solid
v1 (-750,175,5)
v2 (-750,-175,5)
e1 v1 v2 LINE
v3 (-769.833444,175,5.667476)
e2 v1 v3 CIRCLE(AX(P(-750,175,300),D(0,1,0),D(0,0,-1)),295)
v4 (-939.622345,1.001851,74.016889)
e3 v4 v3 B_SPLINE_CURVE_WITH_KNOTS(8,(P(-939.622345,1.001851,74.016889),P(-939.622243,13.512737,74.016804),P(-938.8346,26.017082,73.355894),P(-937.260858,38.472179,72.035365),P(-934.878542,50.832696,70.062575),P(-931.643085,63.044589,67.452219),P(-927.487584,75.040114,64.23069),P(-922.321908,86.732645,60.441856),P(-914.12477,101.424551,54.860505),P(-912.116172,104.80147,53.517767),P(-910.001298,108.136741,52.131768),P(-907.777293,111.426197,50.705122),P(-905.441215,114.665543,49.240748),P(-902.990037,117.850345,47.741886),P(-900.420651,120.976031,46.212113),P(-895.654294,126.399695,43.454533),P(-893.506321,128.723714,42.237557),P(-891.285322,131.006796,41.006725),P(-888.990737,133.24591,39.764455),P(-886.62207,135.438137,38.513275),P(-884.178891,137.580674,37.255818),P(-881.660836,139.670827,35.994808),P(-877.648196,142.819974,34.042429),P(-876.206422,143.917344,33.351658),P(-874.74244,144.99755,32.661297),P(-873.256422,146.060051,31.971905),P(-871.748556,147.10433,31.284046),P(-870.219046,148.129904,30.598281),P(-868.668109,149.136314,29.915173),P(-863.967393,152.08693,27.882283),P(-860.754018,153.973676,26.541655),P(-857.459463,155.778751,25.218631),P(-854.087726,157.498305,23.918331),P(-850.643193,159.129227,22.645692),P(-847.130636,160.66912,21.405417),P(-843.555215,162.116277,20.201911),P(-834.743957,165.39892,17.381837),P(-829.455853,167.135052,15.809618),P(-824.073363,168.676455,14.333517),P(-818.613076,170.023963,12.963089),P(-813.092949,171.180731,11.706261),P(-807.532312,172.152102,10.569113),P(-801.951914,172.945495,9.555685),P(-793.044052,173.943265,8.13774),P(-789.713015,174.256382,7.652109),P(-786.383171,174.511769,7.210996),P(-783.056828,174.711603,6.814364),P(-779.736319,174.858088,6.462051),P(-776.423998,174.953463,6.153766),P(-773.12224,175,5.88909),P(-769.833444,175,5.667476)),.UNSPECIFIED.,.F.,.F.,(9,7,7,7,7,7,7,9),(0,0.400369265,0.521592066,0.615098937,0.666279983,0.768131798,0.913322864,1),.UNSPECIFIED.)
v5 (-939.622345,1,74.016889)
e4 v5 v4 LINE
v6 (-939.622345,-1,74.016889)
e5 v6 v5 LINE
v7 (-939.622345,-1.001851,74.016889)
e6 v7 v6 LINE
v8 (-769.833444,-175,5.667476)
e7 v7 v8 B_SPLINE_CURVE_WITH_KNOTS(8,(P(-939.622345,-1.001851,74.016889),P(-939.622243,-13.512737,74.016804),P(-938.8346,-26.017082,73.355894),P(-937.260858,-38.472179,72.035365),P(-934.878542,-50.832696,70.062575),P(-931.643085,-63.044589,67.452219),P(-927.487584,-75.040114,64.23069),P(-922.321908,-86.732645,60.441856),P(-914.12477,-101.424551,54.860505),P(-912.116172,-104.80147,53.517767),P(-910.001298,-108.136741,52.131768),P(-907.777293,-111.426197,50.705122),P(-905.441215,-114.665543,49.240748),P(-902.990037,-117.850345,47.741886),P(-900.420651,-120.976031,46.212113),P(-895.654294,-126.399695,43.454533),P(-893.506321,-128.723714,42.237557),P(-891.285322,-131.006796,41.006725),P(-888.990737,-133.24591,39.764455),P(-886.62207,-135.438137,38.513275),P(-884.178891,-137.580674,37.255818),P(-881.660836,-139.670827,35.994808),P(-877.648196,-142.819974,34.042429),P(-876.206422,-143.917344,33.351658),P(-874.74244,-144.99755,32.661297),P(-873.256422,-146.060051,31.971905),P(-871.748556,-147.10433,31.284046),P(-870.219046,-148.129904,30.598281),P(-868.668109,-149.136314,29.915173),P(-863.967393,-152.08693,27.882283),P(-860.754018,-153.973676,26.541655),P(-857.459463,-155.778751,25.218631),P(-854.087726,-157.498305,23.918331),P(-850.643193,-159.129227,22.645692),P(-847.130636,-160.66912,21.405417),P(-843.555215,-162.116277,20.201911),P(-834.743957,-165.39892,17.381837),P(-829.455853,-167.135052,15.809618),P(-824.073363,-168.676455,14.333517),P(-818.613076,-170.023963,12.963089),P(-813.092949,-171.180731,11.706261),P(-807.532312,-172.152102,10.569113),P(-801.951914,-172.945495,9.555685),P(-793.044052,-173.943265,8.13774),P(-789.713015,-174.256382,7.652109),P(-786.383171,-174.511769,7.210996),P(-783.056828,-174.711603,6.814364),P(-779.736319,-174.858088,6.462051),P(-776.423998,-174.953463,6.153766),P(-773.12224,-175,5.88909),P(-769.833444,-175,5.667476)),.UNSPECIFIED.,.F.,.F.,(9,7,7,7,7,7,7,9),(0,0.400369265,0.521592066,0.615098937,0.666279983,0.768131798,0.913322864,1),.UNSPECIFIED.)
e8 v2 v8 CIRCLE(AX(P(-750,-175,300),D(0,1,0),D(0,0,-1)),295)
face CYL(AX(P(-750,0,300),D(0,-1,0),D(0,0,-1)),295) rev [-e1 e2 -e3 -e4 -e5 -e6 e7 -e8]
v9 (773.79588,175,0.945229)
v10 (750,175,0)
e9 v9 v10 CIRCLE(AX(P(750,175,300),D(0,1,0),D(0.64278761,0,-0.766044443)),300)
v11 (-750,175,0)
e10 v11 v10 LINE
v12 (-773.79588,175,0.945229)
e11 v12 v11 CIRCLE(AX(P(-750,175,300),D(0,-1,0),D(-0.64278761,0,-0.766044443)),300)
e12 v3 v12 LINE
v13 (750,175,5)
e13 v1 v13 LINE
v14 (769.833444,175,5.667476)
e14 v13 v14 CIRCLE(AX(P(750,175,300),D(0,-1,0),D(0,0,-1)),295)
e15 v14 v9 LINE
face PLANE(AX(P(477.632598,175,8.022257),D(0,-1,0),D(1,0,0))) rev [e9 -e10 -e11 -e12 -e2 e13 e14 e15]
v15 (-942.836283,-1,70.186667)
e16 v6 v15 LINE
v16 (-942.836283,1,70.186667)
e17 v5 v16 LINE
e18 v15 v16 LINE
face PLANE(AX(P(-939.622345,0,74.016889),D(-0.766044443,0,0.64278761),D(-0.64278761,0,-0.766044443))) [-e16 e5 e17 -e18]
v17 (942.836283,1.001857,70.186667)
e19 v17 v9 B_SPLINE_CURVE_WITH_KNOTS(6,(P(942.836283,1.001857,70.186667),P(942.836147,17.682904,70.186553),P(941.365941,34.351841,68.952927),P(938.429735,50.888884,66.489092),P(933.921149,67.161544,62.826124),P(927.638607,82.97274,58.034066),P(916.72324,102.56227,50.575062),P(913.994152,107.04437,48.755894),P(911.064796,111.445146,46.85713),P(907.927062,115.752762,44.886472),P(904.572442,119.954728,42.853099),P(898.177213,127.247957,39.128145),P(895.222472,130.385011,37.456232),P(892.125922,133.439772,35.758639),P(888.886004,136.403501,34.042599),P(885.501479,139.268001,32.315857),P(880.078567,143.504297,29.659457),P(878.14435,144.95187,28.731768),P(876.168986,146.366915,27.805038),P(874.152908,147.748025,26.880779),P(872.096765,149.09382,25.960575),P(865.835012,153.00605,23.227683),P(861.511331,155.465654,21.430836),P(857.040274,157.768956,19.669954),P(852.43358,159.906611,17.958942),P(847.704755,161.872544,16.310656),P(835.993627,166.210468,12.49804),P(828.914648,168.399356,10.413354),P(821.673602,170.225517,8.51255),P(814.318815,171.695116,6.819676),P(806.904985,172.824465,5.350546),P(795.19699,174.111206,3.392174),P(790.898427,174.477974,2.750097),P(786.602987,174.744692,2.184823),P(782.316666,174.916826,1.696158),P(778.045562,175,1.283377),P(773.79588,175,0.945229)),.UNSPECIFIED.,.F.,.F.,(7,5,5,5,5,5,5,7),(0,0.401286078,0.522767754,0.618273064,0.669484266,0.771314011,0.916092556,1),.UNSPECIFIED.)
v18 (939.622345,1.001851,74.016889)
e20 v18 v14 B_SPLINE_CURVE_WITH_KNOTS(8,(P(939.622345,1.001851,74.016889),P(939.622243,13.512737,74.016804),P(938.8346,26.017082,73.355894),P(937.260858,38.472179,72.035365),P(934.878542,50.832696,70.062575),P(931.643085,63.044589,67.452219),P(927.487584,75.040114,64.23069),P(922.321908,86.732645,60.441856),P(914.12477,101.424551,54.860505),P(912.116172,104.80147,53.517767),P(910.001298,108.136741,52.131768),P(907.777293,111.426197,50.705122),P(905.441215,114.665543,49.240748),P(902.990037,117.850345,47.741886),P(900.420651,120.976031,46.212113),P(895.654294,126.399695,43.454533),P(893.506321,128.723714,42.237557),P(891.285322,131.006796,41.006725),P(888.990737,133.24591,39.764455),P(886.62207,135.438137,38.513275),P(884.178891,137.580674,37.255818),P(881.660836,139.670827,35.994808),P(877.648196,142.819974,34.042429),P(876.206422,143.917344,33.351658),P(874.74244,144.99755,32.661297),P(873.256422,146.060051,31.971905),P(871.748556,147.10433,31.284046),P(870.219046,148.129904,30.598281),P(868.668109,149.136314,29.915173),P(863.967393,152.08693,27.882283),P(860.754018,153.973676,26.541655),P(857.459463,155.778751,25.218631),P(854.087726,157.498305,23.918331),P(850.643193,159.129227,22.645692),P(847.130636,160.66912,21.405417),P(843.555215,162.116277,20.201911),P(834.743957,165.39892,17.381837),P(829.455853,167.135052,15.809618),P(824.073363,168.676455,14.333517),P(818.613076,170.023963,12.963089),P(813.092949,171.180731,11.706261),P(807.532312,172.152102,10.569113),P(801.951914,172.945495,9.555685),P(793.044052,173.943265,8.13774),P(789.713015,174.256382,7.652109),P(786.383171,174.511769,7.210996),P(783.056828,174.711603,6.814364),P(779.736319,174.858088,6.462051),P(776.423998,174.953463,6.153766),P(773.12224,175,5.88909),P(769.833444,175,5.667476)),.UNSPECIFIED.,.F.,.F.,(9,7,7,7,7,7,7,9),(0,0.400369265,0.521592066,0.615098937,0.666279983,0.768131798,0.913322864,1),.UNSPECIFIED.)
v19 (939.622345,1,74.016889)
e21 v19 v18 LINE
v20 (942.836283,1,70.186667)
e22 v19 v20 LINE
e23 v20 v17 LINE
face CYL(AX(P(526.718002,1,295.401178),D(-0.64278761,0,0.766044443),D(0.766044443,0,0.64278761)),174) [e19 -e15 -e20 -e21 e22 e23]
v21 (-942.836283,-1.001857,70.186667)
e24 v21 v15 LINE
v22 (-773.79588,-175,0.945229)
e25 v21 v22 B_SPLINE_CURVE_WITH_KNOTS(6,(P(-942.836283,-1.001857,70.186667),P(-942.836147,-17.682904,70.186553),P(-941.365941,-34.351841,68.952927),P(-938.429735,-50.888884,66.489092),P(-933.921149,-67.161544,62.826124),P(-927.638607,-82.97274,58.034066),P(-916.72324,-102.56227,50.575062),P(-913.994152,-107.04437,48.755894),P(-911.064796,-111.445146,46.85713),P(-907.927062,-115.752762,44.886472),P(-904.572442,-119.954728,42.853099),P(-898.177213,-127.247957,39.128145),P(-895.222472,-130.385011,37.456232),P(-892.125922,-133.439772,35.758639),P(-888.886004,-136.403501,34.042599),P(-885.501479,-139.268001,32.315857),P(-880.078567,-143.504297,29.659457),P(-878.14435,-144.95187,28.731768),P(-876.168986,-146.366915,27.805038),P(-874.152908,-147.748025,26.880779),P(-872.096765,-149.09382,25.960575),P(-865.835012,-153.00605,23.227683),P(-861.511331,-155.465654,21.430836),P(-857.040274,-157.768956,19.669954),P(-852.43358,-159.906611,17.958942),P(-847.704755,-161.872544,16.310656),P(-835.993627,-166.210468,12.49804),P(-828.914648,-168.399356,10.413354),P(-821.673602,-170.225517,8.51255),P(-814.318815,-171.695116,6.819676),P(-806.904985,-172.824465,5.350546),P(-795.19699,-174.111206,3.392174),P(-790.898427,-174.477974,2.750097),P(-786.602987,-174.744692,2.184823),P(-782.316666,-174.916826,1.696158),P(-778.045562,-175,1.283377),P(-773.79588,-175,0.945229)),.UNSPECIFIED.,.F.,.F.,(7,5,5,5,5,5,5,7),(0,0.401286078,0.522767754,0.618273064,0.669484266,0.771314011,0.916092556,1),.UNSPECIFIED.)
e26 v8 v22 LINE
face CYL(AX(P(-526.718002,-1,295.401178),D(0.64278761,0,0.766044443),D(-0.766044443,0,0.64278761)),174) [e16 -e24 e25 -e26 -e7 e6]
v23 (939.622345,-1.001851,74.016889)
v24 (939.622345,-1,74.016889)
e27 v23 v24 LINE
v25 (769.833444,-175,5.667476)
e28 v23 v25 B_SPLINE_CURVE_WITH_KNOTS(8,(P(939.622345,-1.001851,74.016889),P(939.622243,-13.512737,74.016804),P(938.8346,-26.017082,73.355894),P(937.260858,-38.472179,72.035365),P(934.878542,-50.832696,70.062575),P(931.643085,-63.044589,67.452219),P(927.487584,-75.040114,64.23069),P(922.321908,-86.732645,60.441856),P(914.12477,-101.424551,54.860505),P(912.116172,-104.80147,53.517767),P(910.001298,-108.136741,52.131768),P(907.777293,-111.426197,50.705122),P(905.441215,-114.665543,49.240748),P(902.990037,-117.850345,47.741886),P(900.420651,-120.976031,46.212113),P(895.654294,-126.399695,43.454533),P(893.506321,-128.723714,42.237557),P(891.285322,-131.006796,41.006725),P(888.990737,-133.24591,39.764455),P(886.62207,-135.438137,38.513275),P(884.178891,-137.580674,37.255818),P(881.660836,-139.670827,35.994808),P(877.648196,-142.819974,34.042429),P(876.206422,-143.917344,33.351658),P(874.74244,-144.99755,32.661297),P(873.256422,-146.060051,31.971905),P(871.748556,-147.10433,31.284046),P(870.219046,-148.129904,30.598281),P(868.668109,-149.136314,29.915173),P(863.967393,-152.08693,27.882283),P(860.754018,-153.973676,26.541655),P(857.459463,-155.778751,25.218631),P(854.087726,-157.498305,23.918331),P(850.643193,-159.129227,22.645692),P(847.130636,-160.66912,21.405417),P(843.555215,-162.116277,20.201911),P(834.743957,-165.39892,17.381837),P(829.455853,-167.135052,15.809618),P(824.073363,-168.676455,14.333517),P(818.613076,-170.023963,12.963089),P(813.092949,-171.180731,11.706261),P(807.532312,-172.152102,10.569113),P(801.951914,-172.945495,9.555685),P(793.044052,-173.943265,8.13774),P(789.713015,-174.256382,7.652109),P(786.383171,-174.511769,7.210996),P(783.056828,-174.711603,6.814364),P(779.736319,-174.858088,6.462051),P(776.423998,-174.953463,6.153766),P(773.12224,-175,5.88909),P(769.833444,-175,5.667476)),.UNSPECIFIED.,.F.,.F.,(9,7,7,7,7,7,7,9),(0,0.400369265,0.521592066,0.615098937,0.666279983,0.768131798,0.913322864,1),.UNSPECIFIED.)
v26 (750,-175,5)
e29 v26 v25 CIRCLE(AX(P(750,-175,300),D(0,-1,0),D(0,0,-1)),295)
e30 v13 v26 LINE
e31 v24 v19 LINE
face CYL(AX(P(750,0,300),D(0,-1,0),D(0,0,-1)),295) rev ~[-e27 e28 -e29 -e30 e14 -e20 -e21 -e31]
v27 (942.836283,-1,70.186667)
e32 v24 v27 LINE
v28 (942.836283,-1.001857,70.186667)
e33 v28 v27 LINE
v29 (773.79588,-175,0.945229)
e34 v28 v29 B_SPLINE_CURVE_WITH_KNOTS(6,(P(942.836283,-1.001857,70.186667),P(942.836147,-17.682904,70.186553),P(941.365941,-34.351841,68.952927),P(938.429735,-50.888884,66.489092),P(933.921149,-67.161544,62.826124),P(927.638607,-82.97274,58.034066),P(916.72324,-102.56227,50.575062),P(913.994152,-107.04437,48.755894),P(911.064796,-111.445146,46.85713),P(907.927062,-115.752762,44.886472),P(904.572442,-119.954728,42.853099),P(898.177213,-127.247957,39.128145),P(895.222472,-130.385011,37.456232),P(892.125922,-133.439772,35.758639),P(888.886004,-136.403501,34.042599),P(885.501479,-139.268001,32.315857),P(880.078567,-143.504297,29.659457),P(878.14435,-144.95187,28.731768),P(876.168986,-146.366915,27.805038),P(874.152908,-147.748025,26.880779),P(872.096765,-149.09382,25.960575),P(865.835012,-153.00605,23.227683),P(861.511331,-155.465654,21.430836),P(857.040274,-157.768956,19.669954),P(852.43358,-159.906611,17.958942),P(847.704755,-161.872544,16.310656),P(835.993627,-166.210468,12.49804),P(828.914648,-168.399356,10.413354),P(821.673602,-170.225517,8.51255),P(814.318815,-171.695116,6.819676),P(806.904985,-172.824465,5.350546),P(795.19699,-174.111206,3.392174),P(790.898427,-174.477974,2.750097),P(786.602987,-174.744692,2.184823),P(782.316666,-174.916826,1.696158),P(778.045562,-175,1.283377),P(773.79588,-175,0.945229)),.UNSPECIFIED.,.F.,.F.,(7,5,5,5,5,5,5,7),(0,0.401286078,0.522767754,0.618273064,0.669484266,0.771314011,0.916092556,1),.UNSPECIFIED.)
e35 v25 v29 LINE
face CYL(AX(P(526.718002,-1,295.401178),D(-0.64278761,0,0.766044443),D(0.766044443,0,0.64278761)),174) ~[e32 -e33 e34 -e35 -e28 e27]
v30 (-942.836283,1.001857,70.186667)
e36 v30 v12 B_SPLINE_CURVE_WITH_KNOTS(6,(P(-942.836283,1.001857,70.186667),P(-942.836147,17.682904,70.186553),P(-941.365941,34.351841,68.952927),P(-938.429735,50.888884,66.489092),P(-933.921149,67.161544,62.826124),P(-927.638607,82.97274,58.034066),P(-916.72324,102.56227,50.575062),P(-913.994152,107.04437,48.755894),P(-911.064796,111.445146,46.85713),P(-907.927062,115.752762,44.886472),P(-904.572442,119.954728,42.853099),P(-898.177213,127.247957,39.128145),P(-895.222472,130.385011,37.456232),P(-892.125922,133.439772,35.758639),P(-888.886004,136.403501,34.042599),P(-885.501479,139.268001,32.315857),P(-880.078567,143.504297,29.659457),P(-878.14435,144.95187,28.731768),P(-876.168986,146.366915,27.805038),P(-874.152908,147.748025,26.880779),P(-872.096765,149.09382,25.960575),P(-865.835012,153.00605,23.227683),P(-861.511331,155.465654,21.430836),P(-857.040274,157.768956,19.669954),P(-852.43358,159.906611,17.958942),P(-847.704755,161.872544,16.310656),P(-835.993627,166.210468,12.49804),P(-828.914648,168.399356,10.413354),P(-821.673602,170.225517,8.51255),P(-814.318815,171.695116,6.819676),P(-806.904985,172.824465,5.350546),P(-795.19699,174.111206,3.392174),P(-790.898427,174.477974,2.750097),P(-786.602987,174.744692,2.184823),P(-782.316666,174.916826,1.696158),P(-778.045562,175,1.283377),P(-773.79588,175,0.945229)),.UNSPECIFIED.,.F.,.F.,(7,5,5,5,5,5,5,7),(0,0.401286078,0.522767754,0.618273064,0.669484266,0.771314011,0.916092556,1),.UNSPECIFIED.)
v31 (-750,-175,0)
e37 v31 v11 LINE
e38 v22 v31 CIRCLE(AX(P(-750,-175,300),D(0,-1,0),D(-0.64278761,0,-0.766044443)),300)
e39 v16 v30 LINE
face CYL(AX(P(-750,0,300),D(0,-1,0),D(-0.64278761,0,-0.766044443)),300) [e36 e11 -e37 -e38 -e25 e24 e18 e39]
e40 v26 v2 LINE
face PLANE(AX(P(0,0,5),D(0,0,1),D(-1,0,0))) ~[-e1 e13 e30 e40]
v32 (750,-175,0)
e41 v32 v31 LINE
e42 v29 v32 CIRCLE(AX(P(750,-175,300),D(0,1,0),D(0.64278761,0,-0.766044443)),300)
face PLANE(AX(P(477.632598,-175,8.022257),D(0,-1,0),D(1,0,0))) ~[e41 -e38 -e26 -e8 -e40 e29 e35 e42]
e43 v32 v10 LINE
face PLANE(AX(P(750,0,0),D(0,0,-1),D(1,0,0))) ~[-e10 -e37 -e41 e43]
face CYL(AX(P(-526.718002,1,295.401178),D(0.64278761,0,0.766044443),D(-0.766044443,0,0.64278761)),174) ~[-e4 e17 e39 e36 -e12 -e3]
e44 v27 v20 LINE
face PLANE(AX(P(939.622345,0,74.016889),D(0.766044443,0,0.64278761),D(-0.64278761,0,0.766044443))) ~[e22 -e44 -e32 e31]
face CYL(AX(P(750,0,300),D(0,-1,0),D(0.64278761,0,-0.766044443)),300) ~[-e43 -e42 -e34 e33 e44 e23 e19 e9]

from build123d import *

# Parameters (mm, degrees)
F1_DEPTH    = 175
F2_T1_DEPTH = 875


# Not quite as in the source:
# - a fillet or chamfer that OpenCascade refuses, or shapes differently, is made with other operations: its cross-section is extruded or revolved along the edge and cut away or added


with BuildPart() as f1:
    # F0 (on Front) → F1 (new body, symmetric)
    with BuildSketch(Plane.XZ):
        with BuildLine():
            Line((-750, 0), (0, 0))
            Line((0, 0), (0, 5))
            Line((0, 5), (-750, 5))
            ThreePointArc((-750, 5), (-850.8959422811, 22.7906768682), (-939.6223448575, 74.0168892799))
            Line((-939.6223448575, 74.0168892799), (-942.836282906, 70.1866670643))
            ThreePointArc((-942.836282906, 70.1866670643), (-852.6060429977, 18.0922137642), (-750, 0))
        make_face()
    extrude(amount=F1_DEPTH, both=True)

    # F2: fillet of radius 174 on 2 edges, made by hand

    # F2_s2 → F2_t1 (cut)
    with BuildSketch(Plane(origin=(-72.170505067, 0, -86.0094586929), x_dir=(0, 1, 0), z_dir=(-0.6427876097, 0, -0.7660444431))):
        with BuildLine():
            ThreePointArc((-1, -767.3696152452), (-124.0365799265, -716.4061951717), (-175, -593.3696152452))
            Line((-175, -593.3696152452), (-175, -767.3696152452))
            Line((-175, -767.3696152452), (-1, -767.3696152452))
        make_face()
        with BuildLine():
            ThreePointArc((1, -767.3696152452), (124.0365799265, -716.4061951717), (175, -593.3696152452))
            Line((175, -593.3696152452), (175, -767.3696152452))
            Line((175, -767.3696152452), (1, -767.3696152452))
        make_face()
    extrude(amount=F2_T1_DEPTH, mode=Mode.SUBTRACT)

    # F3: F1 across plane


with BuildPart() as f1_1:
    add(f1.part)
    add(f1.part.mirror(Plane.YZ))


solid = f1_1.part
